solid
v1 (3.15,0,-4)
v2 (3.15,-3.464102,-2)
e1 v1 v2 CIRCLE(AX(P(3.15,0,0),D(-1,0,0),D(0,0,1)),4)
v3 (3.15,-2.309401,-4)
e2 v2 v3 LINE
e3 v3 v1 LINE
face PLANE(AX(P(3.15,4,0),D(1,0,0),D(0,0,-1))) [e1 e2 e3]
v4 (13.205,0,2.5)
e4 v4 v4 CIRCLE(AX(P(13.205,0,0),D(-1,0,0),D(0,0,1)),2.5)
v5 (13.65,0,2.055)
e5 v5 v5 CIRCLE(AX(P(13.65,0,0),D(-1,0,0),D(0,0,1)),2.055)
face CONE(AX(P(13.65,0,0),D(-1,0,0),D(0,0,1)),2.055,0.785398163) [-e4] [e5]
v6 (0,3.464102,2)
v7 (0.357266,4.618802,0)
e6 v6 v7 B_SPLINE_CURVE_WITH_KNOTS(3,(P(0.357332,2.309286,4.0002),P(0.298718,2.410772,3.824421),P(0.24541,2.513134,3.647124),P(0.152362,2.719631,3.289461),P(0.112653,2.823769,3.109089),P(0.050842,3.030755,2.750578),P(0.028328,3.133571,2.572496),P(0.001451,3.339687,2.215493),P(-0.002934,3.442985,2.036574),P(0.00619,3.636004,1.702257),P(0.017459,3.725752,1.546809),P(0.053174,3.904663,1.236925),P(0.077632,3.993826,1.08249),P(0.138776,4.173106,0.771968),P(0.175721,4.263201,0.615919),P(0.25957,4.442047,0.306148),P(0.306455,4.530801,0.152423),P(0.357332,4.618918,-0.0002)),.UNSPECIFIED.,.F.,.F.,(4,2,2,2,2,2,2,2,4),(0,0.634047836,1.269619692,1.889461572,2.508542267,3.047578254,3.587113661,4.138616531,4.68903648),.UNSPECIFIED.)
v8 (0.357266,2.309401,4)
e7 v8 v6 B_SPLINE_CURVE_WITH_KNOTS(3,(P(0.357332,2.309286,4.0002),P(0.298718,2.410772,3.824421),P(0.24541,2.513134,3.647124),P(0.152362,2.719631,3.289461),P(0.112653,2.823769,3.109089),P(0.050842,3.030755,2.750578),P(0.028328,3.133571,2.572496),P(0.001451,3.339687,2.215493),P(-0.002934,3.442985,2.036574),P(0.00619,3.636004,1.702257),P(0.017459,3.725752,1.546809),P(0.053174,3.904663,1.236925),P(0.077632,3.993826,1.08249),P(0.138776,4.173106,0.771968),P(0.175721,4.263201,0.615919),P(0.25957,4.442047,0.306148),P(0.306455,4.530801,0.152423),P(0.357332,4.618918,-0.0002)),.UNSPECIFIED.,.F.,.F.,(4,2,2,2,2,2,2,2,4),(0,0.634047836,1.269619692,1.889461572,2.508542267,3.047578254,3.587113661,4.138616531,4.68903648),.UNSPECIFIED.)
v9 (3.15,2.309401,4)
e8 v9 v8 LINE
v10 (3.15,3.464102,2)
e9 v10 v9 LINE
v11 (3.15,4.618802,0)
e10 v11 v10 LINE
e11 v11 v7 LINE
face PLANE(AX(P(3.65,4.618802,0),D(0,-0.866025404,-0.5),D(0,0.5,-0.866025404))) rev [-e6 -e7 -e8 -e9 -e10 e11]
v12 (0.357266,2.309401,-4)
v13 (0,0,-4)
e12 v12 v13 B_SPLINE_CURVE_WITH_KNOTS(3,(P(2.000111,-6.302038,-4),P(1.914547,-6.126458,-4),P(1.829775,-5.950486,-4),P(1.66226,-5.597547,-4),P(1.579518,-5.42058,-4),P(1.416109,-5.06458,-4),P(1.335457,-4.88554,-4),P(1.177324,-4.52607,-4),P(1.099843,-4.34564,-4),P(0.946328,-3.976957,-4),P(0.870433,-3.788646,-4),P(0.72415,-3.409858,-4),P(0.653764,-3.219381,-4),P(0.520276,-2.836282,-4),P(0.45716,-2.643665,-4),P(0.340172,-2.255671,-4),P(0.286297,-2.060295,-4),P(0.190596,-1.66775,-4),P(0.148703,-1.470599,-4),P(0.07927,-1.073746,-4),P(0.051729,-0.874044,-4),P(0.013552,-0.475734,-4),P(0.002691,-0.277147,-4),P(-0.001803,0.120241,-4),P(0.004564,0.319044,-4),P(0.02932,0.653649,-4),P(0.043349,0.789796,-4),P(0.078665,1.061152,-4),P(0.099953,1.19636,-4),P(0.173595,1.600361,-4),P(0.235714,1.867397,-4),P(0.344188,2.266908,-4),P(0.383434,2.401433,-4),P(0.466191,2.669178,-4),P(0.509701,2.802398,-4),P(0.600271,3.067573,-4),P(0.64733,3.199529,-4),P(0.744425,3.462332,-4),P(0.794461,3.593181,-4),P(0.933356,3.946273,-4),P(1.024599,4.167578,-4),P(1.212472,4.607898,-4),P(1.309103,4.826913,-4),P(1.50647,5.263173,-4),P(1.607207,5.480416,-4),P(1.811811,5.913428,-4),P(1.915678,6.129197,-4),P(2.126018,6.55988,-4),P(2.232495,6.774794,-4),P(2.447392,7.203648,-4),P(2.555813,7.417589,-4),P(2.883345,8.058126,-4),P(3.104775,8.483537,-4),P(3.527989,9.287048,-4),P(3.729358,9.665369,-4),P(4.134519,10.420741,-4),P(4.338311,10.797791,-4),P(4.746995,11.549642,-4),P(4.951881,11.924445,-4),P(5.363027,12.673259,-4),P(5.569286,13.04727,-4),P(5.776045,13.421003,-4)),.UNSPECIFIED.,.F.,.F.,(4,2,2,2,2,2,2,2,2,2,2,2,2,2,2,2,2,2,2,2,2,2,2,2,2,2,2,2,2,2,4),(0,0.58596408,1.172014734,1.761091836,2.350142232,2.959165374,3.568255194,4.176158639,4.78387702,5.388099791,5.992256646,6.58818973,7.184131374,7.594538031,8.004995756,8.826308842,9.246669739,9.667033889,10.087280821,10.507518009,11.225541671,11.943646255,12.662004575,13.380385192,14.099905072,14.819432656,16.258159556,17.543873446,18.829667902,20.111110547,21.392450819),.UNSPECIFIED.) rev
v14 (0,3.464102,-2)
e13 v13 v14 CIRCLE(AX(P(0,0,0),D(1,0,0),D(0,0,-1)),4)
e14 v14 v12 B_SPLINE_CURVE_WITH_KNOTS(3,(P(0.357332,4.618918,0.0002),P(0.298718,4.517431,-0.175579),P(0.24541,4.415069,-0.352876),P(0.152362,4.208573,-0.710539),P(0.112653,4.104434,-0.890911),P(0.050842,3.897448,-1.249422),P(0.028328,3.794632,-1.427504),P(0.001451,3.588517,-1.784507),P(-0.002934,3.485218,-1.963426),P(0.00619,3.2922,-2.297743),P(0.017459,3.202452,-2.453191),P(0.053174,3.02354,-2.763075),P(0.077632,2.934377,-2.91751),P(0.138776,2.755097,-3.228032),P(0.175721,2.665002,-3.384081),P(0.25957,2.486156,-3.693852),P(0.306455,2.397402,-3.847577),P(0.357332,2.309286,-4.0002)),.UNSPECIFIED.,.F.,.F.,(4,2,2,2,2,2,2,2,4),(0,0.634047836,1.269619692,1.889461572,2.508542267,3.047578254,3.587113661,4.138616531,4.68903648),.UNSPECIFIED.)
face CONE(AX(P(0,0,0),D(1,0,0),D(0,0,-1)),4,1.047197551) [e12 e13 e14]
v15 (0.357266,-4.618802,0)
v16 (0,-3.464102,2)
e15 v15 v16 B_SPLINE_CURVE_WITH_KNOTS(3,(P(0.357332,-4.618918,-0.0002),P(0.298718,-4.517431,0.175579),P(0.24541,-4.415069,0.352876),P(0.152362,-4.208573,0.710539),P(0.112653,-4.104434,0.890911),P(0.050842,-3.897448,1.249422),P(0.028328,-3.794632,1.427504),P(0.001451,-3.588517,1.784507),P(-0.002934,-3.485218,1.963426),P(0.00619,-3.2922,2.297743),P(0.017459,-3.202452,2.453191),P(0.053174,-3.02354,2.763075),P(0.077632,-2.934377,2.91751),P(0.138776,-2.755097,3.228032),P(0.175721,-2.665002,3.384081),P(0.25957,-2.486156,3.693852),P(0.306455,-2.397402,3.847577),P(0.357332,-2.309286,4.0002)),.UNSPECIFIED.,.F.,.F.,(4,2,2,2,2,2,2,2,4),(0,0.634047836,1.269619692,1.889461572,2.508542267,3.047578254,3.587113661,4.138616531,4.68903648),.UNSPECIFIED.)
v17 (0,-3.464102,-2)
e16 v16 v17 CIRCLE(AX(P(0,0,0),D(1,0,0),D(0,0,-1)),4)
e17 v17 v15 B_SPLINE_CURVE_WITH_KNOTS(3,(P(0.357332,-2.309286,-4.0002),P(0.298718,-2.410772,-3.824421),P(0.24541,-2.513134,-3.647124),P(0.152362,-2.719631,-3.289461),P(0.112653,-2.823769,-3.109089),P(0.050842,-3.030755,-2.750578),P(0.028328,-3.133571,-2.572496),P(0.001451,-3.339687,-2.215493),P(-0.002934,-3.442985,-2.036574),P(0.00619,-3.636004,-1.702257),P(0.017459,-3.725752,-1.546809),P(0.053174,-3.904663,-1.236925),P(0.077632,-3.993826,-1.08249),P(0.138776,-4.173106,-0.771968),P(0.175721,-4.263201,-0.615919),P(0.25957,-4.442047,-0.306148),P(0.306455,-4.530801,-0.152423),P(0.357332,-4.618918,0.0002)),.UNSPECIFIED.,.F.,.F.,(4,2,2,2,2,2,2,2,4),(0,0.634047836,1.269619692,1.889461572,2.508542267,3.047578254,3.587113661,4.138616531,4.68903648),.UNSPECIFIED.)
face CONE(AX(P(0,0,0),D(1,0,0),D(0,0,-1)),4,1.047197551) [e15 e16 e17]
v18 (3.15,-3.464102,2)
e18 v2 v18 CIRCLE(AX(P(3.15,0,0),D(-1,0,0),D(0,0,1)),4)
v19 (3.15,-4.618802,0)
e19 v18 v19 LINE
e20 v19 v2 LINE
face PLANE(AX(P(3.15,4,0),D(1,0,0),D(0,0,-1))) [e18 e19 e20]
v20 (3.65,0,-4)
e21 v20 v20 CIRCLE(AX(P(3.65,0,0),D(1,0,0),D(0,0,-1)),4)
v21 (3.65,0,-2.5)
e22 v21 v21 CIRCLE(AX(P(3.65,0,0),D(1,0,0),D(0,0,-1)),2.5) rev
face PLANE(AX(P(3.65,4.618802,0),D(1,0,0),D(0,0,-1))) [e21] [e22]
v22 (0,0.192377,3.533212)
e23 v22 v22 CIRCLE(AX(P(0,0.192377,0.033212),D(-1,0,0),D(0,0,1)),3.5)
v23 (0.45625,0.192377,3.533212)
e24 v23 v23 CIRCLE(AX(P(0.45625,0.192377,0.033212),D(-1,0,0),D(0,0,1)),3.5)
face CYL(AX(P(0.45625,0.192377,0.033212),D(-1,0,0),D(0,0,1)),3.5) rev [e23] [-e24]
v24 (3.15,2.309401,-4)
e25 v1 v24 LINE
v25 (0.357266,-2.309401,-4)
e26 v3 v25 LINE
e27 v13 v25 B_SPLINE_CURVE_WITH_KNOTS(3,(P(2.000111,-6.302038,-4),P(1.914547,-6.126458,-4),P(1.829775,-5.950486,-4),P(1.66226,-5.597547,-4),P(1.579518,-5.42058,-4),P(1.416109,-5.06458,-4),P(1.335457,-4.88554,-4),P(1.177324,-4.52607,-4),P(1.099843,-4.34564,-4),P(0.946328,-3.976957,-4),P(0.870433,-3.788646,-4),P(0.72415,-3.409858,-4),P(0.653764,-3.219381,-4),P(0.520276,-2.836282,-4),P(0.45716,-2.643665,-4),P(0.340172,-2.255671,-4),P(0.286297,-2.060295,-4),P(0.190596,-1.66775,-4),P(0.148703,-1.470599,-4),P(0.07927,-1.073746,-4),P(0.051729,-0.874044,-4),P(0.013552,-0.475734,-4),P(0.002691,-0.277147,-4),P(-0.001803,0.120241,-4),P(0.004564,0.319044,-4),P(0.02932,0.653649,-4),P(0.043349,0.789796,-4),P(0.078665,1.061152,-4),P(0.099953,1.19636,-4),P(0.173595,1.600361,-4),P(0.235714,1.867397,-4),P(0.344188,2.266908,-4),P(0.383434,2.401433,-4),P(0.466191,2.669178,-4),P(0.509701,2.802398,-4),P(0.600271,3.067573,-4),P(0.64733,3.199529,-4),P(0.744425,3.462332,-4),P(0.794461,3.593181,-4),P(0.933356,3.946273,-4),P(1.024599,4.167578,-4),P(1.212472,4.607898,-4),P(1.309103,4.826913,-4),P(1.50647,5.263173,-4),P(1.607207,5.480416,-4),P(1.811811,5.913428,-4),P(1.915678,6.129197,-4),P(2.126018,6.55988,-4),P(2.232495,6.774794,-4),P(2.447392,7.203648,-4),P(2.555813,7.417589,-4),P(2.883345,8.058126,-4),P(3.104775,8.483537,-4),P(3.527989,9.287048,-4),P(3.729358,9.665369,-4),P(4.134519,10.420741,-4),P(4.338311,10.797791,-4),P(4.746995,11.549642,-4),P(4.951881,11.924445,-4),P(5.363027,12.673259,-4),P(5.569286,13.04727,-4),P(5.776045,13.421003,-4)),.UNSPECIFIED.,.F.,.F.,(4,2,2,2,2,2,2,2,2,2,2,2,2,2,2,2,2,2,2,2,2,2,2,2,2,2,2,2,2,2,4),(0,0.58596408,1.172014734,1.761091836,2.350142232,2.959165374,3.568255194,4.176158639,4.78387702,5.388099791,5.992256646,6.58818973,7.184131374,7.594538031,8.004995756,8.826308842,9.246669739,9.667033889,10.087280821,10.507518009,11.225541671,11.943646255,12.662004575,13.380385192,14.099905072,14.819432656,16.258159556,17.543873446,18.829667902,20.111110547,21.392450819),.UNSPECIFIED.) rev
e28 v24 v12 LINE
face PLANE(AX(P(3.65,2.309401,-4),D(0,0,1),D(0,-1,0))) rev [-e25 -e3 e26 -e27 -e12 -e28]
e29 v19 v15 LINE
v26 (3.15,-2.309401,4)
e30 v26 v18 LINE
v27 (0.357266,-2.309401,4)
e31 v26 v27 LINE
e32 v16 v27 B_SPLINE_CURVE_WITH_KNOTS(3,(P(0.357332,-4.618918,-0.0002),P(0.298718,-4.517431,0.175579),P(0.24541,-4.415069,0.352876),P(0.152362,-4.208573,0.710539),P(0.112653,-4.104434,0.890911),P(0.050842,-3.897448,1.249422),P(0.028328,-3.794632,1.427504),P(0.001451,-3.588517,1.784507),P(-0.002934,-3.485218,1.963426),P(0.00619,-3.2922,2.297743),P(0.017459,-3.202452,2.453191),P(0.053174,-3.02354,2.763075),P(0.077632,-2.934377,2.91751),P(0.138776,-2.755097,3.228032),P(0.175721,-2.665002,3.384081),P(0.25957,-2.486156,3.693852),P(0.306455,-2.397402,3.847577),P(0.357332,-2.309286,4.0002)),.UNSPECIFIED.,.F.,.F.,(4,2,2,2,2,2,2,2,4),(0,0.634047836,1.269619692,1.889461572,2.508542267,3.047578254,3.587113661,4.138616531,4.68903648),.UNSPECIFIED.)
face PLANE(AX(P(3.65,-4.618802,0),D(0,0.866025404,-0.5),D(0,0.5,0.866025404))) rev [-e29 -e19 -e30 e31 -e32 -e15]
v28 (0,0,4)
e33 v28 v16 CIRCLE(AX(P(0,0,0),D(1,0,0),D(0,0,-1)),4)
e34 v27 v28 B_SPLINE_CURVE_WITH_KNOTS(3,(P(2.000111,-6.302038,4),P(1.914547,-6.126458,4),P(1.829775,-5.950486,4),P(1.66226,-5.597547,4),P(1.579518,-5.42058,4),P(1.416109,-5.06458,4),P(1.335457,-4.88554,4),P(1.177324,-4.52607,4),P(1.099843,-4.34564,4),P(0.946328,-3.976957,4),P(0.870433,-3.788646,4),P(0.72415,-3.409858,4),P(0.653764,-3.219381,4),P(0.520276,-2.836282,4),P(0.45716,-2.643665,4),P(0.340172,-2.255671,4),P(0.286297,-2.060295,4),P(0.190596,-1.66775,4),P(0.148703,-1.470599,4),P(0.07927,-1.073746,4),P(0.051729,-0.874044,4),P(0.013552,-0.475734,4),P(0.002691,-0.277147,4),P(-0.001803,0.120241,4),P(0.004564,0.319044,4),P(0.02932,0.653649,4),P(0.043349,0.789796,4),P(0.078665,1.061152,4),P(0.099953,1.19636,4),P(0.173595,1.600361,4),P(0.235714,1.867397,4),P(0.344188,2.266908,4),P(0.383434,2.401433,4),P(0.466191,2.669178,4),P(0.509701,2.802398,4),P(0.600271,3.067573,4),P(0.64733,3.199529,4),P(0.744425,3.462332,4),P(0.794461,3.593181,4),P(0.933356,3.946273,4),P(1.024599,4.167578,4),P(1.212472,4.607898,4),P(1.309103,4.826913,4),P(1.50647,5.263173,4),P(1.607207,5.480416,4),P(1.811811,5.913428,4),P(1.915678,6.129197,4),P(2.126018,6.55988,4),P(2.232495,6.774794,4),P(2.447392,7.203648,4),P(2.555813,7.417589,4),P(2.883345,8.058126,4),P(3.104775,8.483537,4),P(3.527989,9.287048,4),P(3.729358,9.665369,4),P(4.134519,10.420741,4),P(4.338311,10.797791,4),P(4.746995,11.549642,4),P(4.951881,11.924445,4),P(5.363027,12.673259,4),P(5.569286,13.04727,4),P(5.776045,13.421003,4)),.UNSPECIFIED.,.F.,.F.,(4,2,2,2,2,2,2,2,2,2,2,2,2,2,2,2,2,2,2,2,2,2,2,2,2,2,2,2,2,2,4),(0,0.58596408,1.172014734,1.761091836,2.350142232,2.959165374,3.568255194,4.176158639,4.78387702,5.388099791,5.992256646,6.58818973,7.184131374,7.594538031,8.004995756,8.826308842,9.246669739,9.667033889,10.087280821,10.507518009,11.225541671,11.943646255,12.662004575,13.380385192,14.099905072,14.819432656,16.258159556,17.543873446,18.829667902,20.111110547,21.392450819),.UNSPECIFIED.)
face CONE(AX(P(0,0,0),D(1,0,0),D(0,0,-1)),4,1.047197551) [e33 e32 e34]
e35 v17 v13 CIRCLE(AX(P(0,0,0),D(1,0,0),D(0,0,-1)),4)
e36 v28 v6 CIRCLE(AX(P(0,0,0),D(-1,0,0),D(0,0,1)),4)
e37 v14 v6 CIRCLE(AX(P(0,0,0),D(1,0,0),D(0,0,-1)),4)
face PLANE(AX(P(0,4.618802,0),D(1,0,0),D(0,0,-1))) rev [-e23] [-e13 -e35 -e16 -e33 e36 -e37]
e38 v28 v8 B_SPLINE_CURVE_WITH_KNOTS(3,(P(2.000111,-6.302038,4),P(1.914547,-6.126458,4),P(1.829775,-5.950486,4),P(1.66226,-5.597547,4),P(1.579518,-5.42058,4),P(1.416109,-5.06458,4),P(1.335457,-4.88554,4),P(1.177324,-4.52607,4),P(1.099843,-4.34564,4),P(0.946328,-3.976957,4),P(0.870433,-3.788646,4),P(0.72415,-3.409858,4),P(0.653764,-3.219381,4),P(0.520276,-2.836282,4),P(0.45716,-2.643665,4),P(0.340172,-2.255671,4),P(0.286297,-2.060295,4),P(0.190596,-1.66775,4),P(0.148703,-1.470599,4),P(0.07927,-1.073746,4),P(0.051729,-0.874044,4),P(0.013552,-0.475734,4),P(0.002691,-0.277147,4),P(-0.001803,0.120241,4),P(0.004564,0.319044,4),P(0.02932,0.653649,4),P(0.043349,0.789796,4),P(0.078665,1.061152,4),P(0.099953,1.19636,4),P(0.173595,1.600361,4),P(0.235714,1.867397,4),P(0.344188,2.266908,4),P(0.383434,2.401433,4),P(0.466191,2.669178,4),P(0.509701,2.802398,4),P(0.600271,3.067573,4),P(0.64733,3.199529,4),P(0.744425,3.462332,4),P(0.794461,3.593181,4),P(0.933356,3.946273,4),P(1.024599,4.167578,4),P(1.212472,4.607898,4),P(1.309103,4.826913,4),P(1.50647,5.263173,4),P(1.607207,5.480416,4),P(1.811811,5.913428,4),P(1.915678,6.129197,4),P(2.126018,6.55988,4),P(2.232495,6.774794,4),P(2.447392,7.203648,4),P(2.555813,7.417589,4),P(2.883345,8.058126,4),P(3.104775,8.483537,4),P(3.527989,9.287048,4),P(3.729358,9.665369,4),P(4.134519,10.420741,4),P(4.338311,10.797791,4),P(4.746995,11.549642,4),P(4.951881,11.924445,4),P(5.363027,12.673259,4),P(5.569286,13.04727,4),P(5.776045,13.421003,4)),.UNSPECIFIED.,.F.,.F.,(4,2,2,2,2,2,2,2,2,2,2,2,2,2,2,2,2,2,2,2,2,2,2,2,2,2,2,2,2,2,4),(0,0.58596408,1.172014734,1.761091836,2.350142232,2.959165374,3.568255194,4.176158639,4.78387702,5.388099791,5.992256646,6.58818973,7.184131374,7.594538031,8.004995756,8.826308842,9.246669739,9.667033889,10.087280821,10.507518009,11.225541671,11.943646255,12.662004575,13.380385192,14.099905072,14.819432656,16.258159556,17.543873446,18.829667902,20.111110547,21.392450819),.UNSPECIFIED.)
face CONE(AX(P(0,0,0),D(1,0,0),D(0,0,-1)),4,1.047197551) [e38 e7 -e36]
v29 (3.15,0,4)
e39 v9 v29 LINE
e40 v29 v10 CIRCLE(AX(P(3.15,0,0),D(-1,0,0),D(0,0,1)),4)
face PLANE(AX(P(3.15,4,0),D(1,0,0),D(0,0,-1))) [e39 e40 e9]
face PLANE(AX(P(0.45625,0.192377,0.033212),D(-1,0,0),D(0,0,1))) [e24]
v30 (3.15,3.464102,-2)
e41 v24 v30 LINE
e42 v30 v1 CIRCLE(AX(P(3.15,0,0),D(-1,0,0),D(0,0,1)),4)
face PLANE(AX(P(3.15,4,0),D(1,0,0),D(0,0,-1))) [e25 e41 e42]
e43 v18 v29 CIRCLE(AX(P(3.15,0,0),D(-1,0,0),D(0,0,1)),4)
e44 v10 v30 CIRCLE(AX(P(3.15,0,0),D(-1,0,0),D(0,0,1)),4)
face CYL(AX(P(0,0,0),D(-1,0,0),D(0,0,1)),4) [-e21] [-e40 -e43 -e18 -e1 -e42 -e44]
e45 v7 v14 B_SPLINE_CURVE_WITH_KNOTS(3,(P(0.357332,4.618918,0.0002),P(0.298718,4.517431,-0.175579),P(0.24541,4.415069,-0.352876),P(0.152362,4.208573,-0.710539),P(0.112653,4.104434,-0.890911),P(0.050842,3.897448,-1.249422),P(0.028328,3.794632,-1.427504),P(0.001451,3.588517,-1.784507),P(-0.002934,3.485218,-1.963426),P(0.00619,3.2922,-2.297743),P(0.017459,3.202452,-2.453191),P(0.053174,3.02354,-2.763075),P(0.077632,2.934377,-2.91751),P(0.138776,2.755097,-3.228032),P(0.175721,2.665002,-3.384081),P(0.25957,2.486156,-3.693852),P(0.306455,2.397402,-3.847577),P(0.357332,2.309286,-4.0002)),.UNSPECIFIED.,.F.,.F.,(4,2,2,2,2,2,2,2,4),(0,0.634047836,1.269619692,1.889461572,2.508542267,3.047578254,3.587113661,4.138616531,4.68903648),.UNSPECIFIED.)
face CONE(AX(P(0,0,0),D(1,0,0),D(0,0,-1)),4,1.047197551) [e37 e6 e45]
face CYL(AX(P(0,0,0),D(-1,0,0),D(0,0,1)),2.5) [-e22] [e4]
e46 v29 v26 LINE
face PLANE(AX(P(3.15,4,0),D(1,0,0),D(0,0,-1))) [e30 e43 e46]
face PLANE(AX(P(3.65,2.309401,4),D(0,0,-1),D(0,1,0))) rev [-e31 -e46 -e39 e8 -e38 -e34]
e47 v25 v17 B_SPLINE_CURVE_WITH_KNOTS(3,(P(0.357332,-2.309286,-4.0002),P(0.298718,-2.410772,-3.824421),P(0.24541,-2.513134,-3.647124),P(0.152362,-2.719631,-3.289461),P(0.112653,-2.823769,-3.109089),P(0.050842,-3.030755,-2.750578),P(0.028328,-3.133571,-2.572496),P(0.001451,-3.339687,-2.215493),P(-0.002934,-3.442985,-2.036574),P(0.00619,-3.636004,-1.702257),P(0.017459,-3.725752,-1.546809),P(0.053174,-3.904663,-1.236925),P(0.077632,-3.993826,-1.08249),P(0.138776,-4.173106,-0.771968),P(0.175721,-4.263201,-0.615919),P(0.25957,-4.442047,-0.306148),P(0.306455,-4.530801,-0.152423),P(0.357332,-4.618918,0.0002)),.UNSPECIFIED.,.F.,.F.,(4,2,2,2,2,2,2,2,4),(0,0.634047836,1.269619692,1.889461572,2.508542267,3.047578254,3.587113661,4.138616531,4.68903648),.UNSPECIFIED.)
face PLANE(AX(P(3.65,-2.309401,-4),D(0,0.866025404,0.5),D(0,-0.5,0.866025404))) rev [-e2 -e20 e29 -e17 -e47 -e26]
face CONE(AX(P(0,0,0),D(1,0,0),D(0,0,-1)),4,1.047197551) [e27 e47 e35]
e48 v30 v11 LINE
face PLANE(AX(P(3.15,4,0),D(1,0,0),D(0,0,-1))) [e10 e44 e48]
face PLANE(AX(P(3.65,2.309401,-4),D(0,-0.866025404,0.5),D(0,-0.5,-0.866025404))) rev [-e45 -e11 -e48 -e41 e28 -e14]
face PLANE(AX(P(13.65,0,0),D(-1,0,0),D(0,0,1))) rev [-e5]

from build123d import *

# Parameters (mm, degrees)
BASEHEAD_DEPTH     = 3.65
INDENT_START       = -0.45625
INDENT_2_OUTLINE_R = 3.5
INDENT_2_DEPTH     = 0.45625
SKETCH4_W          = 0.5
SKETCH4_H          = 10.618802154


# Read off the part's stored shape, not the designer's step: Indent
with BuildPart() as part:
    # Sketch1 → BaseHead (new body)
    with BuildSketch(Plane(origin=(0, 0, 0), x_dir=(0, 0, -1), z_dir=(1, 0, 0))):
        Polygon((4, 2.309401077), (4, -2.309401077), (0, -4.618802154), (-4, -2.309401077), (-4, 2.309401077), (0, 4.618802154), align=None)
    extrude(amount=BASEHEAD_DEPTH)

    # Indent outline → Indent (revolve)
    with BuildSketch(Plane.YX):
        Polygon((2.5, 3.65), (2.5, 13.205), (2.055, 13.65), (0, 13.65), (0, 3.65), align=None)
    revolve(axis=Axis((0, 0, 0), (1, 0, 0)))

    # Indent 2 outline → Indent 2 (cut)
    with BuildSketch(Plane.ZY.offset(INDENT_START)):
        with Locations((0.033212245, 0.192376607)):
            Circle(INDENT_2_OUTLINE_R)
    extrude(amount=INDENT_2_DEPTH, mode=Mode.SUBTRACT)

    # Sketch3 → HeadChamfer (revolve, cut)
    with BuildSketch(Plane.XY, mode=Mode.PRIVATE) as headchamfer_sk:
        Polygon((0, 4), (3.244016936, 9.618802154), (3.244016936, 14.618802154), (-10, 14.618802154), (-10, 4), align=None)
    revolve(headchamfer_sk.sketch.rotate(Axis((0, 0, 0), (1, 0, 0)), 90), axis=Axis((0, 0, 0), (1, 0, 0)), mode=Mode.SUBTRACT)

    # Sketch4 → BearingFace (revolve, cut)
    with BuildSketch(Plane.XY, mode=Mode.PRIVATE) as bearingface_sk:
        with Locations((3.4, 9.309401077)):
            Rectangle(SKETCH4_W, SKETCH4_H)
    revolve(bearingface_sk.sketch.rotate(Axis((0, 0, 0), (1, 0, 0)), 90), axis=Axis((0, 0, 0), (1, 0, 0)), mode=Mode.SUBTRACT)


solid = part.part
